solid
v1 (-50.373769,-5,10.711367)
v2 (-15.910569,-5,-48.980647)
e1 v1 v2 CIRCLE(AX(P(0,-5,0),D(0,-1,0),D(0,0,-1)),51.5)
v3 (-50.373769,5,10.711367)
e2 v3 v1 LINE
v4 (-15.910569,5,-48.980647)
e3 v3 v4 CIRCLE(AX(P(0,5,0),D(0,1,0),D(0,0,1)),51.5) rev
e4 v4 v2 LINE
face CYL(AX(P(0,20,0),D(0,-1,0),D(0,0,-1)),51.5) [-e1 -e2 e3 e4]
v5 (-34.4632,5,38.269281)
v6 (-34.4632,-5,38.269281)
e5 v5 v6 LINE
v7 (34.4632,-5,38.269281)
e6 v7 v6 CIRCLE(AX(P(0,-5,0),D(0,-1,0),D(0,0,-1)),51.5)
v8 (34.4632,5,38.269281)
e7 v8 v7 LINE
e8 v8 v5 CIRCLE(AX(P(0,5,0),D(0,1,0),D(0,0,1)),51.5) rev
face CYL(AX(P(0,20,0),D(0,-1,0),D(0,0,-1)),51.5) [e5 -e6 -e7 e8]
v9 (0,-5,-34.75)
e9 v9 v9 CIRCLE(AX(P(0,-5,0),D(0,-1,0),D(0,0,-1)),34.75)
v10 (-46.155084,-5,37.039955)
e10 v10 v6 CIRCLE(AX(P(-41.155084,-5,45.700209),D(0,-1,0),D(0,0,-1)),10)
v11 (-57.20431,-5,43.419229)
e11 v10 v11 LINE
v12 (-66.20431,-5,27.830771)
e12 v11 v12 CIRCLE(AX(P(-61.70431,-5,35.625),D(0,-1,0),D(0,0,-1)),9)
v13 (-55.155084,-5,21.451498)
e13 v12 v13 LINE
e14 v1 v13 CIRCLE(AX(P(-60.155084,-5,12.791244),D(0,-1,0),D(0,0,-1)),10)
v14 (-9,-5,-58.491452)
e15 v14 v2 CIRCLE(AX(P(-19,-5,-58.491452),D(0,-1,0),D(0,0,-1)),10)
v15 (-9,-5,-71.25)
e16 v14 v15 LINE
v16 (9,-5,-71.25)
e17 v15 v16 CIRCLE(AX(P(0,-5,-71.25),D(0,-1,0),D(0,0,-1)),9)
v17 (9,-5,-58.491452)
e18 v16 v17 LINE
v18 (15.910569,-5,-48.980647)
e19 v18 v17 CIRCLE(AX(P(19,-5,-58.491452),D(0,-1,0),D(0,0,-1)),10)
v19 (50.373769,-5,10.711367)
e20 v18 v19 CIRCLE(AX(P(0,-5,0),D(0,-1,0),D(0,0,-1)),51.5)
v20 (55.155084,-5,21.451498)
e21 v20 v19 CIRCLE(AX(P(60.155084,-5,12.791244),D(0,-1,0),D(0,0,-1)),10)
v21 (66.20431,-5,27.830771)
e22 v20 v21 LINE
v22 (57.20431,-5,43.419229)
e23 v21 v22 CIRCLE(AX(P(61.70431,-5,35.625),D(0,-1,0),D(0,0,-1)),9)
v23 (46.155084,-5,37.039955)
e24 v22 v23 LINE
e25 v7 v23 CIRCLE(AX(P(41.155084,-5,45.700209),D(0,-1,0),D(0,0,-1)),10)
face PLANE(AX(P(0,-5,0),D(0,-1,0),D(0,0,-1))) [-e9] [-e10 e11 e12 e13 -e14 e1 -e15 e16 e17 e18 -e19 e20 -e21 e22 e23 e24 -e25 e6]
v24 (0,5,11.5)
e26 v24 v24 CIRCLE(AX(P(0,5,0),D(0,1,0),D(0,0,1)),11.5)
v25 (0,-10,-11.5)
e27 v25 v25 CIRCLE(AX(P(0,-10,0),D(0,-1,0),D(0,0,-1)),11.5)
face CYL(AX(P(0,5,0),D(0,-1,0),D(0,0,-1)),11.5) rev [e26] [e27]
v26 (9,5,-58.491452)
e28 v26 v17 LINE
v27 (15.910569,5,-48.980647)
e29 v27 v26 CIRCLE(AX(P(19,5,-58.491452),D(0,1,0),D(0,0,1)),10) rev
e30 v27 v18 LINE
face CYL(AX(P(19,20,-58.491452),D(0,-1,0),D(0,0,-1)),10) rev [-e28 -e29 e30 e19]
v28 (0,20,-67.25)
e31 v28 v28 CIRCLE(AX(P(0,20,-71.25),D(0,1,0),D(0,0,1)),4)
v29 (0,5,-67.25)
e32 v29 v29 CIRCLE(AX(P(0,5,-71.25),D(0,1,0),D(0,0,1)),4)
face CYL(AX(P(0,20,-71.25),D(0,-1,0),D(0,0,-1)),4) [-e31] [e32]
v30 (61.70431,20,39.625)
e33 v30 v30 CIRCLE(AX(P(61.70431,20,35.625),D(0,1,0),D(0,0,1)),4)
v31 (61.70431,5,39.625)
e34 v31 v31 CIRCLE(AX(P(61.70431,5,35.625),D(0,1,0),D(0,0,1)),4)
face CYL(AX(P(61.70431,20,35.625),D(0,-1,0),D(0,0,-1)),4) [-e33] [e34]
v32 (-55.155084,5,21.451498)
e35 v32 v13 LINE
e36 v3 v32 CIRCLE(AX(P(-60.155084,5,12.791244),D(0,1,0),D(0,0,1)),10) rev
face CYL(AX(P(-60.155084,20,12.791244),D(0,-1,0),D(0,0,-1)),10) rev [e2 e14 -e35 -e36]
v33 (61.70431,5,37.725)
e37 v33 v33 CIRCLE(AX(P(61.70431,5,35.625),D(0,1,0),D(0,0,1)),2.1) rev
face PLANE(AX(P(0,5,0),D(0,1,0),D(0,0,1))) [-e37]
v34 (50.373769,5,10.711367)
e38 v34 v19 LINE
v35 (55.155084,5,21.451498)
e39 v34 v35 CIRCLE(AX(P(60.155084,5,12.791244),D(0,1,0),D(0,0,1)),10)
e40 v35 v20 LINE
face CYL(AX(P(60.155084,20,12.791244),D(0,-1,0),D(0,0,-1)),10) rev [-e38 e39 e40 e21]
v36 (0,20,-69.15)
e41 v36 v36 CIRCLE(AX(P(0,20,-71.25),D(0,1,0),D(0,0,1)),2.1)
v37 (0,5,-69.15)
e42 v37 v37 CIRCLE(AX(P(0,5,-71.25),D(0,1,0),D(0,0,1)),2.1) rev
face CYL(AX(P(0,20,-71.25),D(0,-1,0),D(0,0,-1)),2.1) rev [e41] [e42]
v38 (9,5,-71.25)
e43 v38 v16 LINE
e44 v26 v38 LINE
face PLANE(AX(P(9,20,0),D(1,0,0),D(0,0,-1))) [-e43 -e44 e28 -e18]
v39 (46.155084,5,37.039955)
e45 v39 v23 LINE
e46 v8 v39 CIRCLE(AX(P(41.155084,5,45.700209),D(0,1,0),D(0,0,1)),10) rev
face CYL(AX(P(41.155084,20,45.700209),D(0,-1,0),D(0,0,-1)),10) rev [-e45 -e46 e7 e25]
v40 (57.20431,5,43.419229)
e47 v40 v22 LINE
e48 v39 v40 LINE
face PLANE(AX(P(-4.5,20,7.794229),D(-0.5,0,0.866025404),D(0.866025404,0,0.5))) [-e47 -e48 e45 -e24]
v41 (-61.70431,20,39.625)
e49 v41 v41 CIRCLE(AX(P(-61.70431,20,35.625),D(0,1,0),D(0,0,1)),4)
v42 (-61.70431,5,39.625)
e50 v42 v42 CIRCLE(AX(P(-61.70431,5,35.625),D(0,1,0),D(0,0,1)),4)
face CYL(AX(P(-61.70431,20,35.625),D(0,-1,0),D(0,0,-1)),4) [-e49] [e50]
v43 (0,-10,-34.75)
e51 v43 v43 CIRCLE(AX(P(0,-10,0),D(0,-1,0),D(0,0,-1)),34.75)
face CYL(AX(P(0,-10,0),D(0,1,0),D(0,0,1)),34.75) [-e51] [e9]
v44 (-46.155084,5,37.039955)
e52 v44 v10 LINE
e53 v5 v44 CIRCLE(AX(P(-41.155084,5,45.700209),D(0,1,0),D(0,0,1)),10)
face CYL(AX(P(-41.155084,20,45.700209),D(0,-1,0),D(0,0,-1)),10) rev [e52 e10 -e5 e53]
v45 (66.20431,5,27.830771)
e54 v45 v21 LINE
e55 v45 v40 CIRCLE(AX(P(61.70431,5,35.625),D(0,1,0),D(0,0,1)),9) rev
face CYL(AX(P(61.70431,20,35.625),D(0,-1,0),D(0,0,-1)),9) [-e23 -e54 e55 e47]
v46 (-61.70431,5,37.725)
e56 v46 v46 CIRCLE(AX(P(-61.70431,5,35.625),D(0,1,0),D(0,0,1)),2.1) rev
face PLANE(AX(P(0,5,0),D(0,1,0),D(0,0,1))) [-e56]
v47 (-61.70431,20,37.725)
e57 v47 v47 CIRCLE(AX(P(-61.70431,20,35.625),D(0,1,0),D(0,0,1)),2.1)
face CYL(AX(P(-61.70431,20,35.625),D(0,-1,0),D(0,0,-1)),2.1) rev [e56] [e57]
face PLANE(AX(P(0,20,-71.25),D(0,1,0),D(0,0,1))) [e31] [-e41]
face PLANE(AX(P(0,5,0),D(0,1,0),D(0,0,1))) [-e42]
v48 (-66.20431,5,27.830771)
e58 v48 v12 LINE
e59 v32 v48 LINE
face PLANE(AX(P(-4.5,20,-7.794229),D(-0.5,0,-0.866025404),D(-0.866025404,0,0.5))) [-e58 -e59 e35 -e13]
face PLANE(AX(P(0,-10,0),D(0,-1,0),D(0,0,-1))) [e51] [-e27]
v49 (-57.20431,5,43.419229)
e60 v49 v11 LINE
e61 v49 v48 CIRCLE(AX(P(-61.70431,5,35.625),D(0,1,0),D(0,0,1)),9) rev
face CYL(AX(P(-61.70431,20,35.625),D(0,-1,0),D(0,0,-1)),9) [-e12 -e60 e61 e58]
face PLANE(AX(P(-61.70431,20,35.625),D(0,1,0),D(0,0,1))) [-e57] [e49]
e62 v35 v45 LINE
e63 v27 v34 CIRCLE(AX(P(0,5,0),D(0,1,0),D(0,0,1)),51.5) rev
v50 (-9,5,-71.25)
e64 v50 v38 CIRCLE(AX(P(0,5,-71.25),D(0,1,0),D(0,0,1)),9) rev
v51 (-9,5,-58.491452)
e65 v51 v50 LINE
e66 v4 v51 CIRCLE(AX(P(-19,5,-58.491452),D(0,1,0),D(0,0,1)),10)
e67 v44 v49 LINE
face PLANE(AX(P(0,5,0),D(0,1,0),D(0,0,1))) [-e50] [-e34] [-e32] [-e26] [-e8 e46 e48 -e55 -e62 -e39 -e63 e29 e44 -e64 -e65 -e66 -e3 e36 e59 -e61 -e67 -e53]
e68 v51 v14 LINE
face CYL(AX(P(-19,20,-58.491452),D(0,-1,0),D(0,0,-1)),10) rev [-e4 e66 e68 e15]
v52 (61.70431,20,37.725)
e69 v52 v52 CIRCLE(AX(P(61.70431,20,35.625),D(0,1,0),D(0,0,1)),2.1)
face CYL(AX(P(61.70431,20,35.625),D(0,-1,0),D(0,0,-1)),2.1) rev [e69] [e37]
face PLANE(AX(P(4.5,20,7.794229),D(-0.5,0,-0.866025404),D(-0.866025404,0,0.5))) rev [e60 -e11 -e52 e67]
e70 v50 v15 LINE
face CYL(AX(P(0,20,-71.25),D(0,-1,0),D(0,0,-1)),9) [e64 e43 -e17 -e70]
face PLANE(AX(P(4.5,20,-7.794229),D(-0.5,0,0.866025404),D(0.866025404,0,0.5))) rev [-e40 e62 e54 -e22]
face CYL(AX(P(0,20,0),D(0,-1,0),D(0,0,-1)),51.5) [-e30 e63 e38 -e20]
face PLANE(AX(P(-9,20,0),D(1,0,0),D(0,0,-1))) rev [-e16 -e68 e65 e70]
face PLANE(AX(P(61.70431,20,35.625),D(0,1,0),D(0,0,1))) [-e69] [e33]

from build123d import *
from build123d.topology import SkipClean

# Parameters (mm, degrees)
SKETCH_1_R               = 82.5
SKETCH_1_R_2             = 11.5
EXTRUDE_1_DEPTH          = 5
SKETCH_2_R               = 4
SKETCH_2_R_2             = 2.1
EXTRUDE_2_DEPTH          = 15
EXTRUDE_START            = 5
SKETCH_3_R               = 34
SKETCH_3_R_2             = 11.5
EXTRUDE_3_DEPTH          = 5
CUT_EXTRUDE_1_DEPTH      = 118.63290356
CUT_EXTRUDE_1_DEPTH_BACK = 10
SKETCH_4_R               = 82.5
EXTRUDE_4_DEPTH          = 5
SKETCH_6_R               = 11.5
CUT_EXTRUDE_2_DEPTH      = 109.80791311
SKETCH_7_R               = 34.75
SKETCH_7_R_2             = 11.5
EXTRUDE_5_DEPTH          = 5


with BuildPart() as part:
    # 草圖1 → 填料-伸長1 (new body)
    with BuildSketch(Plane(origin=(0, 0, 0), x_dir=(1, 0, 0), z_dir=(0, 1, 0))):
        with Locations(Location((0, 0, 0), (0, 0, 270))):
            Circle(SKETCH_1_R)
        with Locations(Location((0, 0, 0), (0, 0, 270))):
            Circle(SKETCH_1_R_2, mode=Mode.SUBTRACT)
    extrude(amount=EXTRUDE_1_DEPTH)

    # 草圖2 → 填料-伸長2 (add)
    # profile 1 of 3: a face of its own
    with BuildSketch(Plane(origin=(0, 5, 0), x_dir=(1, 0, 0), z_dir=(0, 1, 0))):
        with Locations(Location((0, 71.25, 0), (0, 0, 270))):
            Circle(SKETCH_2_R)
        with Locations(Location((0, 71.25, 0), (0, 0, 270))):
            Circle(SKETCH_2_R_2, mode=Mode.SUBTRACT)
    # profile 2 of 3: a face of its own
    with BuildSketch(Plane(origin=(0, 5, 0), x_dir=(1, 0, 0), z_dir=(0, 1, 0))):
        with Locations(Location((61.70431002, -35.625, 0), (0, 0, 270))):
            Circle(SKETCH_2_R)
        with Locations(Location((61.70431002, -35.625, 0), (0, 0, 270))):
            Circle(SKETCH_2_R_2, mode=Mode.SUBTRACT)
    # profile 3 of 3: a face of its own
    with BuildSketch(Plane(origin=(0, 5, 0), x_dir=(1, 0, 0), z_dir=(0, 1, 0))):
        with Locations(Location((-61.70431002, -35.625, 0), (0, 0, 270))):
            Circle(SKETCH_2_R)
        with Locations(Location((-61.70431002, -35.625, 0), (0, 0, 270))):
            Circle(SKETCH_2_R_2, mode=Mode.SUBTRACT)
    extrude(amount=EXTRUDE_2_DEPTH)

    # 草圖3 → 填料-伸長3 (add)
    with SkipClean():  # the faces are left unmerged after this step: merging them gives an invalid solid
        with BuildSketch(Plane.XZ.offset(EXTRUDE_START)):
            with Locations(Location((0, 0, 0), (0, 0, 90))):
                Circle(SKETCH_3_R)
            with Locations(Location((0, 0, 0), (0, 0, 270))):
                Circle(SKETCH_3_R_2, mode=Mode.SUBTRACT)
        extrude(amount=-EXTRUDE_3_DEPTH)

    # 草圖4 → 除料-伸長1 (cut, two sides: drawn at the far end of the back side and taken through both)
    with SkipClean():  # the faces are left unmerged after this step: merging them gives an invalid solid
        with BuildSketch(Plane(origin=(0, 5, 0), x_dir=(1, 0, 0), z_dir=(0, 1, 0)).offset(-CUT_EXTRUDE_1_DEPTH_BACK)):
            Circle(SKETCH_4_R)
            with BuildLine():
                ThreePointArc((-34.463200133, -38.269280586), (0, -51.5), (34.463200133, -38.269280586))
                ThreePointArc((34.463200133, -38.269280586), (40.109412614, -35.755030522), (46.155083654, -37.039954818))
                Line((46.155083654, -37.039954818), (57.20431002, -43.419228634))
                ThreePointArc((57.20431002, -43.419228634), (69.498538654, -40.125), (66.20431002, -27.830771366))
                Line((66.20431002, -27.830771366), (55.155083654, -21.451497549))
                ThreePointArc((55.155083654, -21.451497549), (51.019471053, -16.858254994), (50.373769239, -10.711366518))
                ThreePointArc((50.373769239, -10.711366518), (44.600308295, 25.75), (15.910569106, 48.980647104))
                ThreePointArc((15.910569106, 48.980647104), (10.910058438, 52.613285516), (9, 58.491452367))
                Line((9, 58.491452367), (9, 71.25))
                ThreePointArc((9, 71.25), (0, 80.25), (-9, 71.25))
                Line((-9, 71.25), (-9, 58.491452367))
                ThreePointArc((-9, 58.491452367), (-10.910058438, 52.613285516), (-15.910569106, 48.980647104))
                ThreePointArc((-15.910569106, 48.980647104), (-44.600308295, 25.75), (-50.373769239, -10.711366518))
                ThreePointArc((-50.373769239, -10.711366518), (-51.019471053, -16.858254994), (-55.155083654, -21.451497549))
                Line((-55.155083654, -21.451497549), (-66.20431002, -27.830771366))
                ThreePointArc((-66.20431002, -27.830771366), (-69.498538654, -40.125), (-57.20431002, -43.419228634))
                Line((-57.20431002, -43.419228634), (-46.155083654, -37.039954818))
                ThreePointArc((-46.155083654, -37.039954818), (-40.109412614, -35.755030522), (-34.463200133, -38.269280586))
            make_face(mode=Mode.SUBTRACT)
        extrude(amount=CUT_EXTRUDE_1_DEPTH + CUT_EXTRUDE_1_DEPTH_BACK, mode=Mode.SUBTRACT)

    # 草圖5 → 填料-伸長4 (add)
    with BuildSketch(Plane.XZ):
        with BuildLine():
            Line((-46.155083654, 37.039954818), (-57.20431002, 43.419228634))
            ThreePointArc((-57.20431002, 43.419228634), (-69.498538654, 40.125), (-66.20431002, 27.830771366))
            Line((-66.20431002, 27.830771366), (-55.155083654, 21.451497549))
            ThreePointArc((-55.155083654, 21.451497549), (-51.019471053, 16.858254994), (-50.373769239, 10.711366518))
            ThreePointArc((-50.373769239, 10.711366518), (-44.600308295, -25.75), (-15.910569106, -48.980647104))
            ThreePointArc((-15.910569106, -48.980647104), (-10.910058438, -52.613285516), (-9, -58.491452367))
            Line((-9, -58.491452367), (-9, -71.25))
            ThreePointArc((-9, -71.25), (0, -80.25), (9, -71.25))
            Line((9, -71.25), (9, -58.491452367))
            ThreePointArc((9, -58.491452367), (10.910058438, -52.613285516), (15.910569106, -48.980647104))
            ThreePointArc((15.910569106, -48.980647104), (44.600308295, -25.75), (50.373769239, 10.711366518))
            ThreePointArc((50.373769239, 10.711366518), (51.019471053, 16.858254994), (55.155083654, 21.451497549))
            Line((55.155083654, 21.451497549), (66.20431002, 27.830771366))
            ThreePointArc((66.20431002, 27.830771366), (69.498538654, 40.125), (57.20431002, 43.419228634))
            Line((57.20431002, 43.419228634), (46.155083654, 37.039954818))
            ThreePointArc((46.155083654, 37.039954818), (40.109412614, 35.755030522), (34.463200133, 38.269280586))
            ThreePointArc((34.463200133, 38.269280586), (0, 51.5), (-34.463200133, 38.269280586))
            ThreePointArc((-34.463200133, 38.269280586), (-40.109412614, 35.755030522), (-46.155083654, 37.039954818))
        make_face()
    extrude(amount=EXTRUDE_4_DEPTH)

    # 草圖6 → 除料-伸長2 (cut, through all)
    with BuildSketch(Plane(origin=(0, 0, 0), x_dir=(1, 0, 0), z_dir=(0, 1, 0))):
        with Locations(Location((0, 0, 0), (0, 0, 270))):
            Circle(SKETCH_6_R)
    extrude(amount=-CUT_EXTRUDE_2_DEPTH, mode=Mode.SUBTRACT)

    # 草圖7 → 填料-伸長5 (add)
    with SkipClean():  # the faces are left unmerged after this step: merging them gives an invalid solid
        with BuildSketch(Plane.XZ.offset(5)):
            with Locations(Location((0, 0, 0), (0, 0, 270))):
                Circle(SKETCH_7_R)
            with Locations(Location((0, 0, 0), (0, 0, 270))):
                Circle(SKETCH_7_R_2, mode=Mode.SUBTRACT)
        extrude(amount=EXTRUDE_5_DEPTH)
    add(part.part.scale(1), mode=Mode.REPLACE)  # the faces are merged on a copy


solid = part.part
